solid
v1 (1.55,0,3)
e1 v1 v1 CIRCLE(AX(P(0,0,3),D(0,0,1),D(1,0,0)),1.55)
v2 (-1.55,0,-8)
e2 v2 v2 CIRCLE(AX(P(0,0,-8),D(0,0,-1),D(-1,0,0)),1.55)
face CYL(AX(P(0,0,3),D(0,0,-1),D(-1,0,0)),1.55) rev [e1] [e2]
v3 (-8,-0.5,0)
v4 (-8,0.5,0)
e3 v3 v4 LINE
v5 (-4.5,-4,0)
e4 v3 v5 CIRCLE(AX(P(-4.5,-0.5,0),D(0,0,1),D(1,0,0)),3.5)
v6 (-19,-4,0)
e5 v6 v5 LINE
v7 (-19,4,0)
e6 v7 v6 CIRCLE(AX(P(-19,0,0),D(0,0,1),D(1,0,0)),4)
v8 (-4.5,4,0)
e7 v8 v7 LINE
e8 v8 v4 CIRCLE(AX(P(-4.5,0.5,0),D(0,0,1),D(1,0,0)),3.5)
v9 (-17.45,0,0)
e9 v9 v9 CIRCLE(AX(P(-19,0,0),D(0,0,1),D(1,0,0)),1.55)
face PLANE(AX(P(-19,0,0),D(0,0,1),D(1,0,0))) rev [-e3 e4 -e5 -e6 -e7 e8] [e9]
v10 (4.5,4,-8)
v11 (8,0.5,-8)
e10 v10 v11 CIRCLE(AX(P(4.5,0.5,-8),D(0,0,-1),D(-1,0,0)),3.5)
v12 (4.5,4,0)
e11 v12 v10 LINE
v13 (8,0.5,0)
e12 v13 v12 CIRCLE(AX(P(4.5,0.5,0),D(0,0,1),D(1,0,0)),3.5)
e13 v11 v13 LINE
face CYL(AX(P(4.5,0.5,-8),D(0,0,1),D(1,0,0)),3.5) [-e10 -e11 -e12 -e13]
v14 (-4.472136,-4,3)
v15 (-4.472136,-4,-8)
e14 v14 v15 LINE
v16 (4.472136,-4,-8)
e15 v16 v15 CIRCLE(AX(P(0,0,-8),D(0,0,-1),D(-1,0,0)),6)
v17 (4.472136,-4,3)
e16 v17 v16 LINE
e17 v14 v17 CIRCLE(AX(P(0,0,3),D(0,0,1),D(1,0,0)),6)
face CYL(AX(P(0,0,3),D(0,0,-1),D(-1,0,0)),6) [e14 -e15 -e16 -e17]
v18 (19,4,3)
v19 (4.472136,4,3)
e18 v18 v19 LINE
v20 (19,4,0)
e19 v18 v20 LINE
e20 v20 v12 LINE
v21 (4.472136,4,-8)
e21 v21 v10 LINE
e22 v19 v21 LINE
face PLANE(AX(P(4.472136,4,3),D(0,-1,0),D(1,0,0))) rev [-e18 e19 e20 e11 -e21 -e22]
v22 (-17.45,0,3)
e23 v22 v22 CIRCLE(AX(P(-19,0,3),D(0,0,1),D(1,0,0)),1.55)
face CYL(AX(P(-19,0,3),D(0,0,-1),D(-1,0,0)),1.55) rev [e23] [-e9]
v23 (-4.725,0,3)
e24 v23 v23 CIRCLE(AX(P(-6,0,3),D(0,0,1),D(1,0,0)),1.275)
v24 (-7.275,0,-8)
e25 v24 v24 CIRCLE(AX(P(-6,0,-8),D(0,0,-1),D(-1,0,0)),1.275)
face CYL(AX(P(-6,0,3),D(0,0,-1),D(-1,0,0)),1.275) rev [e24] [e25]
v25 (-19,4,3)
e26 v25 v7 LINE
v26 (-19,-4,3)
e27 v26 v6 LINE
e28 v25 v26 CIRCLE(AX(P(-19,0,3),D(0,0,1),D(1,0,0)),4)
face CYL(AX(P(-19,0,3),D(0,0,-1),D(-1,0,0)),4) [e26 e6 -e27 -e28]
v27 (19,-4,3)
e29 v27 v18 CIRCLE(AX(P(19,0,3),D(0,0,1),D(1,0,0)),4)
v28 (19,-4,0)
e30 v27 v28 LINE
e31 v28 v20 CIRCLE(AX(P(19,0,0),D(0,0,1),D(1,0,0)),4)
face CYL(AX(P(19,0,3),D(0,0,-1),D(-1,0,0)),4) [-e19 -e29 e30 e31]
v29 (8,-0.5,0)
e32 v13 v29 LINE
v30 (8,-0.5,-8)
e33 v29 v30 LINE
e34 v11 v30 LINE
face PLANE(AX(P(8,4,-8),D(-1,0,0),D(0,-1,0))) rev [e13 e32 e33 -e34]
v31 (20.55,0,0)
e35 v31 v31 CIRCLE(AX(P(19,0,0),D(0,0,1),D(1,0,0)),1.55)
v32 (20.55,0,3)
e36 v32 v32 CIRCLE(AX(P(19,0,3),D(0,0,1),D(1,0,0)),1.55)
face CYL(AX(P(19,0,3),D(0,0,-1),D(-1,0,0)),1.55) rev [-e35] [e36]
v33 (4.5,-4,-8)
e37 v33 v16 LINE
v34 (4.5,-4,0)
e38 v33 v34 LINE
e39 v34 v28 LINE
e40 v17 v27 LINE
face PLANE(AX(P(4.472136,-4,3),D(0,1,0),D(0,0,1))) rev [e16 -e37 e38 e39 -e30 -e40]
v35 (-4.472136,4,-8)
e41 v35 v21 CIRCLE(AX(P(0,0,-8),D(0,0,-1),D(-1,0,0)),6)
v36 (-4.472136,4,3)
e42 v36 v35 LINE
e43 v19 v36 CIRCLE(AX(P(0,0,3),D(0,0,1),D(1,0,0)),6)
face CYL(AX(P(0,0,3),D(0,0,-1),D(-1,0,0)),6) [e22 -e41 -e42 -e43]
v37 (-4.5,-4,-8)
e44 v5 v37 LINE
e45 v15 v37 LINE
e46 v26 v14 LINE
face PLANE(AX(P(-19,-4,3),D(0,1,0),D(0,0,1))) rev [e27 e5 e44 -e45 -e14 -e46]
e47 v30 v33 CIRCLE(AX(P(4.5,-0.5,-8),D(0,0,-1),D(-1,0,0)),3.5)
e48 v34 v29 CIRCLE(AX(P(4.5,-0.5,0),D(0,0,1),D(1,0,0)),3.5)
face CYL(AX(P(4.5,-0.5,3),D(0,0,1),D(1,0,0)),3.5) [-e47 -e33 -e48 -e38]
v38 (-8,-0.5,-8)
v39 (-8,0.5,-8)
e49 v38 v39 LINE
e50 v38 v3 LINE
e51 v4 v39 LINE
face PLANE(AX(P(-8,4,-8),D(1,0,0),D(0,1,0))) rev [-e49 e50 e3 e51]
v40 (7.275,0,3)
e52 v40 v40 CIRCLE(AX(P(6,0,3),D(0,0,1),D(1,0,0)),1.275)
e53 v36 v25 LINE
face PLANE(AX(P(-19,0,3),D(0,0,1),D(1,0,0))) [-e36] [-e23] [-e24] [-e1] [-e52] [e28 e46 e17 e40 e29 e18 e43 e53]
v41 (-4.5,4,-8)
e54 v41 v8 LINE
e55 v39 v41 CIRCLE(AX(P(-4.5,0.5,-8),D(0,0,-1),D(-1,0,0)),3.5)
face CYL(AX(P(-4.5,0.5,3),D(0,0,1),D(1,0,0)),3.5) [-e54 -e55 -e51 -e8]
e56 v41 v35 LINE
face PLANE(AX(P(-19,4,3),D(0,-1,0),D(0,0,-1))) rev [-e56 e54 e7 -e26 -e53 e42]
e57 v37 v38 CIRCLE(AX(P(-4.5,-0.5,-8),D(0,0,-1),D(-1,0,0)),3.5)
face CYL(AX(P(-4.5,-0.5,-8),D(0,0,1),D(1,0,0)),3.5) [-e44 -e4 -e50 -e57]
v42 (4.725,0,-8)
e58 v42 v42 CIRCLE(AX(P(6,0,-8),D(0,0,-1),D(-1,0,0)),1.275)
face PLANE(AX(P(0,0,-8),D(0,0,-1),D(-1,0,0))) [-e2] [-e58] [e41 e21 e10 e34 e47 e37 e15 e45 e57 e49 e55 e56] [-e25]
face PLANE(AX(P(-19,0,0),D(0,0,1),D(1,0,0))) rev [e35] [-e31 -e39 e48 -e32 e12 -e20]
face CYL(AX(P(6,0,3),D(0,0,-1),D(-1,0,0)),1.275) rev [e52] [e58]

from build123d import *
from build123d.topology import SkipClean

# Parameters (mm, degrees)
SKETCH_1_R      = 1.55
SKETCH_1_R_2    = 1.275
EXTRUDE_1_DEPTH = 3
EXTRUDE_START   = 8
SKETCH_2_R      = 1.55
SKETCH_2_R_2    = 1.275
EXTRUDE_2_DEPTH = 8
FILLET_1_R      = 3.5


with BuildPart() as part:
    # 草图1 → 凸台-拉伸1 (new body)
    with BuildSketch(Plane.XY):
        with BuildLine():
            Line((4.472135955, 4), (19, 4))
            ThreePointArc((19, 4), (23, 0), (19, -4))
            Line((19, -4), (4.472135955, -4))
            ThreePointArc((4.472135955, -4), (0, -6), (-4.472135955, -4))
            Line((-4.472135955, -4), (-19, -4))
            ThreePointArc((-19, -4), (-23, 0), (-19, 4))
            Line((-19, 4), (-4.472135955, 4))
            ThreePointArc((-4.472135955, 4), (0, 6), (4.472135955, 4))
        make_face()
        Circle(SKETCH_1_R, mode=Mode.SUBTRACT)
        with Locations((19, 0)):
            Circle(SKETCH_1_R, mode=Mode.SUBTRACT)
        with Locations((-19, 0)):
            Circle(SKETCH_1_R, mode=Mode.SUBTRACT)
        with Locations((-6, 0)):
            Circle(SKETCH_1_R_2, mode=Mode.SUBTRACT)
        with Locations((6, 0)):
            Circle(SKETCH_1_R_2, mode=Mode.SUBTRACT)
    extrude(amount=EXTRUDE_1_DEPTH)

    # 草图2 → 凸台-拉伸2 (add)
    with SkipClean():  # the faces are left unmerged after this step: merging them gives an invalid solid
        with BuildSketch(Plane(origin=(0, 0, 0), x_dir=(-1, 0, 0), z_dir=(0, 0, -1)).offset(EXTRUDE_START)):
            with BuildLine():
                Line((-8, 4), (-4.472135955, 4))
                ThreePointArc((-4.472135955, 4), (0, 6), (4.472135955, 4))
                Line((4.472135955, 4), (8, 4))
                Line((8, 4), (8, -4))
                Line((8, -4), (4.472135955, -4))
                ThreePointArc((4.472135955, -4), (0, -6), (-4.472135955, -4))
                Line((-4.472135955, -4), (-8, -4))
                Line((-8, -4), (-8, 4))
            make_face()
            Circle(SKETCH_2_R, mode=Mode.SUBTRACT)
            with Locations((-6, 0)):
                Circle(SKETCH_2_R_2, mode=Mode.SUBTRACT)
            with Locations((6, 0)):
                Circle(SKETCH_2_R_2, mode=Mode.SUBTRACT)
        extrude(amount=-EXTRUDE_2_DEPTH)

    # 圆角1
    # the kernel refuses this fillet: 3.5 mm, written as the material it takes off along each edge
    with BuildSketch(Plane(origin=(8, -4, -16.75), x_dir=(0, 1, 0), z_dir=(0, 0, 1)), Plane(origin=(8, 4, -16.75), x_dir=(-1, 0, 0), z_dir=(0, 0, 1))) as fillet_1_piece_1:
        with BuildLine():
            CenterArc((FILLET_1_R, FILLET_1_R), FILLET_1_R, 180, 90)
            Line((0, FILLET_1_R), (0, 0))
            Line((0, 0), (FILLET_1_R, 0))
        make_face()
    extrude(amount=16.75, mode=Mode.SUBTRACT)
    with BuildSketch(Plane(origin=(-8, 4, -16.75), x_dir=(1, 0, 0), z_dir=(0, 0, 1)), Plane(origin=(-8, -4, -16.75), x_dir=(0, 1, 0), z_dir=(0, 0, 1))) as fillet_1_piece_2:
        with BuildLine():
            CenterArc((FILLET_1_R, -FILLET_1_R), FILLET_1_R, 90, 90)
            Line((0, -FILLET_1_R), (0, 0))
            Line((0, 0), (FILLET_1_R, 0))
        make_face()
    extrude(amount=16.75, mode=Mode.SUBTRACT)


solid = part.part
